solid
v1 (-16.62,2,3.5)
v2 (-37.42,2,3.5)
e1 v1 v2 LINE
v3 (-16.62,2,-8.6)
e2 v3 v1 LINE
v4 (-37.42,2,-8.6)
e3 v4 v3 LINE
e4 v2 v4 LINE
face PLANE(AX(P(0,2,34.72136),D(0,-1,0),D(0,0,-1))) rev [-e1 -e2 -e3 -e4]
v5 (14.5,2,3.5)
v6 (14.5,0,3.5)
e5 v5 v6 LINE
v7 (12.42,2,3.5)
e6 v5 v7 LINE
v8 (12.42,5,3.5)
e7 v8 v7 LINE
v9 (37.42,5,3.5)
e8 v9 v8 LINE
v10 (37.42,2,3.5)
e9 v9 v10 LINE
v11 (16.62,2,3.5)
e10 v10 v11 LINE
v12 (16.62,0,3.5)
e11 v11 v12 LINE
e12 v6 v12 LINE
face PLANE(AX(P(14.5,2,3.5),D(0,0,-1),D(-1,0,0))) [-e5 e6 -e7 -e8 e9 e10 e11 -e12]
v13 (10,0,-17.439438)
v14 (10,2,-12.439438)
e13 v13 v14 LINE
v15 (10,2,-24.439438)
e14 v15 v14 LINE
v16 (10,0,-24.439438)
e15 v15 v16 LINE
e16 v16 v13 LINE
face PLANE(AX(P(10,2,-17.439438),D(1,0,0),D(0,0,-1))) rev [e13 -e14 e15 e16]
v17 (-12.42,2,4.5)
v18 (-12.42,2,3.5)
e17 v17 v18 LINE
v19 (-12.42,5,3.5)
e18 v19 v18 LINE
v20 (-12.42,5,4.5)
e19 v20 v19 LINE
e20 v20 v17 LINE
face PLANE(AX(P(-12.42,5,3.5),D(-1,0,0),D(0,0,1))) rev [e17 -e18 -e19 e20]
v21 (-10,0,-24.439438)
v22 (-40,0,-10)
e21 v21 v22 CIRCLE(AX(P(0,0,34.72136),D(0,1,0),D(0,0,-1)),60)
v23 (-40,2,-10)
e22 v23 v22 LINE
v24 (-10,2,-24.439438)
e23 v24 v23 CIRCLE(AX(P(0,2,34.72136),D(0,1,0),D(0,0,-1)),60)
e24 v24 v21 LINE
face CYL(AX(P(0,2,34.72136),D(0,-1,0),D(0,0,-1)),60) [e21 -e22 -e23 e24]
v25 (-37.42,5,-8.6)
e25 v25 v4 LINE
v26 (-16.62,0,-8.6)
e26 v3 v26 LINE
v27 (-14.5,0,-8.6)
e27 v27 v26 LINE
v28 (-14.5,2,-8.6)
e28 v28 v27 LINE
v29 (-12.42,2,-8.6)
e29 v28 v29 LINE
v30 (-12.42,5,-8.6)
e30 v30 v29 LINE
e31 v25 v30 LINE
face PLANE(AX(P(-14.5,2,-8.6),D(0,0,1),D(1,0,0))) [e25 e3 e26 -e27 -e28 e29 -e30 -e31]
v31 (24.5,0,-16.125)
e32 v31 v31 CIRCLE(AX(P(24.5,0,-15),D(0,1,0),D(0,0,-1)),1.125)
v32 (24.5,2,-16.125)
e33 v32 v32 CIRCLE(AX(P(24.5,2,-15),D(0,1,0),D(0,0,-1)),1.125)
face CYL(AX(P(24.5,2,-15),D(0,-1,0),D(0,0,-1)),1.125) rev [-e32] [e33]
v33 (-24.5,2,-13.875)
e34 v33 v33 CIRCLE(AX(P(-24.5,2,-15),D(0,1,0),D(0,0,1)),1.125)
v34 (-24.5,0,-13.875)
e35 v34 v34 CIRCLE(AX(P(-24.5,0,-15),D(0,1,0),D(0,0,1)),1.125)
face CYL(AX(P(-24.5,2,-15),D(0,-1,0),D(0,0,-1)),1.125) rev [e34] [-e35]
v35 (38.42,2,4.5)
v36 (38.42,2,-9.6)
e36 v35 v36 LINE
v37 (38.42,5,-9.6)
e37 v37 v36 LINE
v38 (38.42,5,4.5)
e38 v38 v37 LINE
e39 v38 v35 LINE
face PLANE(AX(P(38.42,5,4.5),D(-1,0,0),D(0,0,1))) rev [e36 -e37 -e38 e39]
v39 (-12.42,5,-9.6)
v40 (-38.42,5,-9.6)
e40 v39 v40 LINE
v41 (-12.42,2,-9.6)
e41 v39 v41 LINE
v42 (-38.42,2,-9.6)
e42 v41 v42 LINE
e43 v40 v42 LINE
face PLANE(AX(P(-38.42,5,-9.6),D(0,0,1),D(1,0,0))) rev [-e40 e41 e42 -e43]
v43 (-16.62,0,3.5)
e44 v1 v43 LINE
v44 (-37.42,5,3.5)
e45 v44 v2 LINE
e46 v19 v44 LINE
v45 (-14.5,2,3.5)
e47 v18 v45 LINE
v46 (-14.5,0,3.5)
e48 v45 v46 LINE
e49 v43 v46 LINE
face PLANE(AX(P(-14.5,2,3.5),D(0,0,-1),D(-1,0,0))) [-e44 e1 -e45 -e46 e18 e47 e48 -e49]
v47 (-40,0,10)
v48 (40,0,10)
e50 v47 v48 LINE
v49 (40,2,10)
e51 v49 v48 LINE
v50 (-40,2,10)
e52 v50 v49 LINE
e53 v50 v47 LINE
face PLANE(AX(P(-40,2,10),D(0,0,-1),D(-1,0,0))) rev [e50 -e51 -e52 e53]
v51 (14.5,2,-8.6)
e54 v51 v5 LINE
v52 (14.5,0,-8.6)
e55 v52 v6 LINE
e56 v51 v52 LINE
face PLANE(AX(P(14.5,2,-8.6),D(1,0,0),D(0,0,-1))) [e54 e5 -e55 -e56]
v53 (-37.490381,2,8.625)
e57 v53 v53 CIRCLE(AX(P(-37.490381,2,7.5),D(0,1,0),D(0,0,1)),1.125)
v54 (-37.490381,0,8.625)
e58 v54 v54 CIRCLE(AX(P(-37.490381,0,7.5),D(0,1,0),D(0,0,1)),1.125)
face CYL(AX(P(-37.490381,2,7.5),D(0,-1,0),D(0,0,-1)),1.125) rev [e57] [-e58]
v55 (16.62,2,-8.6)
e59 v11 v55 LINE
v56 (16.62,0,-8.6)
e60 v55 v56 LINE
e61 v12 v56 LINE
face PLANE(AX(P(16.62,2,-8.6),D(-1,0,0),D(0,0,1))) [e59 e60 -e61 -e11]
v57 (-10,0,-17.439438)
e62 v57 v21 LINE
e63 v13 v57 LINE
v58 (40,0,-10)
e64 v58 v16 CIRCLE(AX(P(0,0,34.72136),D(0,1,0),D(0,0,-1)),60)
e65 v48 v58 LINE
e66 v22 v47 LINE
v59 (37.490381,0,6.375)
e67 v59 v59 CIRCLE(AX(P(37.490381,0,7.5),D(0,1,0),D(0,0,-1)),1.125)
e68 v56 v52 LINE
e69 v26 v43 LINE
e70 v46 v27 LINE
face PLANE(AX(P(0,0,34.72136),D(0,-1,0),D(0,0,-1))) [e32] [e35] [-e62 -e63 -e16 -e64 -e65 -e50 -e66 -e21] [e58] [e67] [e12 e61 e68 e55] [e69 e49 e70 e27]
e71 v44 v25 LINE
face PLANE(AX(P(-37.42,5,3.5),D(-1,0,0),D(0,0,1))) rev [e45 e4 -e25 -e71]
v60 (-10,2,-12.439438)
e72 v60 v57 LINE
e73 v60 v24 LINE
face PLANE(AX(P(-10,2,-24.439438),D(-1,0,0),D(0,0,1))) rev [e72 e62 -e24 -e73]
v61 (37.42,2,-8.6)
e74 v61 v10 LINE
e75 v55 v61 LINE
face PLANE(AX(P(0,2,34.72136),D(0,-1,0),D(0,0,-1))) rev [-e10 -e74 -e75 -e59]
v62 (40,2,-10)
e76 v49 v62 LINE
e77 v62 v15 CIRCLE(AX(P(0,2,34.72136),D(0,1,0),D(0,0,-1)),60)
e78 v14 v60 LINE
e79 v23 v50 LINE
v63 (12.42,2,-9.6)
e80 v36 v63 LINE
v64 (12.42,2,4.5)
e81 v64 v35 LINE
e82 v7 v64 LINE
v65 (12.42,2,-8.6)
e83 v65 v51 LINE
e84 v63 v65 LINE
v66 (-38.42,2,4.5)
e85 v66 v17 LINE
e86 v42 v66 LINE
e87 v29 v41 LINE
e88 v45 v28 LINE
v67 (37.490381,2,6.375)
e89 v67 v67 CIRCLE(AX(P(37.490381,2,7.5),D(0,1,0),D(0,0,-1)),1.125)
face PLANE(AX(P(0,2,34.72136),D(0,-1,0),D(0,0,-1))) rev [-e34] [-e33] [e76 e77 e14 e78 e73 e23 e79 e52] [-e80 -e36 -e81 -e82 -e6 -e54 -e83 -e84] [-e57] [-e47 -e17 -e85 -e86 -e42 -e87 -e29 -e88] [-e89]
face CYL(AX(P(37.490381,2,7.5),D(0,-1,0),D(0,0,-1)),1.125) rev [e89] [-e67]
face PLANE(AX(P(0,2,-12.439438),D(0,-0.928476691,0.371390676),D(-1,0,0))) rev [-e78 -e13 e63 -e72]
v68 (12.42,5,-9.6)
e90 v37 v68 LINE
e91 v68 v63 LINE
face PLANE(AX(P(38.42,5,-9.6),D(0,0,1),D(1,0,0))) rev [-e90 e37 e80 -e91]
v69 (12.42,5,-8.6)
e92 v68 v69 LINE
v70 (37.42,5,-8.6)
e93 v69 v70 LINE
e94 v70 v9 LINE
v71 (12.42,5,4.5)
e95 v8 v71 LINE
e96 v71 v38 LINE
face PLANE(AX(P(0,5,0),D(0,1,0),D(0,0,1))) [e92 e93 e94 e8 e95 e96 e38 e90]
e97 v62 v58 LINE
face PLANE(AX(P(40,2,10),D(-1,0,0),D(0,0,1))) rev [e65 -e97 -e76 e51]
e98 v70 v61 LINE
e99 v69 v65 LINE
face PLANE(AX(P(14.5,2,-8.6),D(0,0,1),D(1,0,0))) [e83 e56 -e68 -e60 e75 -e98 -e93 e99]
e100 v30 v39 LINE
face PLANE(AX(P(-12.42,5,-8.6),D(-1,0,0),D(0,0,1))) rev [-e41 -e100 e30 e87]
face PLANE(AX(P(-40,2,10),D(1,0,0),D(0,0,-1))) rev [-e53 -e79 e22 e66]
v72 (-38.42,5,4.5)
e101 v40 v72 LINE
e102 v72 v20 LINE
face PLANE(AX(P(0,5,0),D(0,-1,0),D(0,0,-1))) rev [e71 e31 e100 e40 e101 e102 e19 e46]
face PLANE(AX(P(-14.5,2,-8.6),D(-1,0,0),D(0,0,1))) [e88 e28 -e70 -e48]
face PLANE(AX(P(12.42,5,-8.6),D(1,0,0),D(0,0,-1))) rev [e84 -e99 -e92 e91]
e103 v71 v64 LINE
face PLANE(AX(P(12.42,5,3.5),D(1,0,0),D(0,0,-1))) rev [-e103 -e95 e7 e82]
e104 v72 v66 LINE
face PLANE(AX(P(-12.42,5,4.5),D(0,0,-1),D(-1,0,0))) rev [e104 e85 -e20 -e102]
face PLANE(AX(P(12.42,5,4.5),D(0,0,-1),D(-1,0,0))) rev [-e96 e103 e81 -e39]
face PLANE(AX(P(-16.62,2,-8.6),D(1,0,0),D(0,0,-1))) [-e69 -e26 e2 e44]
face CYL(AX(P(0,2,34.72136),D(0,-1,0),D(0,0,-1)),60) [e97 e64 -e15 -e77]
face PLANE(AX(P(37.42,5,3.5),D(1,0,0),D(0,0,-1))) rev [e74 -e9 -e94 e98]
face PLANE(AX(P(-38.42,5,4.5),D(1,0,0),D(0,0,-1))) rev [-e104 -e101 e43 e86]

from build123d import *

# Parameters (mm, degrees)
SKETCH2_R           = 1.125
SKETCH2_W           = 2.12
SKETCH2_H           = 12.1
BOSS_EXTRUDE2_DEPTH = 2
BOSS_EXTRUDE3_DEPTH = 3
CHAMFER1_SIZE2      = 2
CHAMFER1_SIZE       = 5


with BuildPart() as part:
    # Sketch2 → Boss-Extrude2 (new body)
    with BuildSketch(Plane(origin=(0, 0, 0), x_dir=(1, 0, 0), z_dir=(0, 1, 0))):
        with BuildLine():
            Line((-10, 24.439438281), (-10, 17.439438281))
            Line((-10, 17.439438281), (10, 17.439438281))
            Line((10, 17.439438281), (10, 24.439438281))
            ThreePointArc((10, 24.439438281), (26.021613026, 19.342266443), (40, 10))
            Line((40, 10), (40, -10))
            Line((40, -10), (-40, -10))
            Line((-40, -10), (-40, 10))
            ThreePointArc((-40, 10), (-26.021613026, 19.342266443), (-10, 24.439438281))
        make_face()
        with Locations(Location((-37.490381057, -7.5, 0), (0, 0, 270))):
            Circle(SKETCH2_R, mode=Mode.SUBTRACT)
        with Locations(Location((37.490381057, -7.5, 0), (0, 0, 90))):
            Circle(SKETCH2_R, mode=Mode.SUBTRACT)
        with Locations(Location((-24.5, 15, 0), (0, 0, 270))):
            Circle(SKETCH2_R, mode=Mode.SUBTRACT)
        with Locations(Location((24.5, 15, 0), (0, 0, 90))):
            Circle(SKETCH2_R, mode=Mode.SUBTRACT)
        with Locations((15.56, 2.55)):
            Rectangle(SKETCH2_W, SKETCH2_H, mode=Mode.SUBTRACT)
        with Locations((-15.56, 2.55)):
            Rectangle(SKETCH2_W, SKETCH2_H, mode=Mode.SUBTRACT)
    extrude(amount=BOSS_EXTRUDE2_DEPTH)

    # Sketch3 → Boss-Extrude3 (add)
    with BuildSketch(Plane(origin=(0, 2, 0), x_dir=(1, 0, 0), z_dir=(0, 1, 0))):
        Polygon((12.419999998, -3.5), (37.42, -3.5), (37.42, 8.6), (12.419999998, 8.6), (12.419999998, 9.599999996), (38.419999998, 9.599999996), (38.419999998, -4.499999996), (12.419999998, -4.499999996), align=None)
        Polygon((-12.419999998, -3.5), (-12.419999998, -4.499999996), (-38.419999998, -4.499999996), (-38.419999998, 9.599999996), (-12.419999998, 9.599999996), (-12.419999998, 8.6), (-37.42, 8.6), (-37.42, -3.5), align=None)
    extrude(amount=BOSS_EXTRUDE3_DEPTH)

    # Chamfer1
    chamfer1_edges = [part.edges().sort_by_distance(p)[0] for p in [
        (0, 2, -17.439438281),
    ]]
    chamfer1_side = [part.faces().sort_by_distance(p)[0] for p in [
        (0, 2, -17.399438281),
    ]]
    chamfer(chamfer1_edges, length=CHAMFER1_SIZE - 0.0001, length2=CHAMFER1_SIZE2 - 0.0001, reference=chamfer1_side[0])  # a hair under: the kernel refuses the full size


solid = part.part
